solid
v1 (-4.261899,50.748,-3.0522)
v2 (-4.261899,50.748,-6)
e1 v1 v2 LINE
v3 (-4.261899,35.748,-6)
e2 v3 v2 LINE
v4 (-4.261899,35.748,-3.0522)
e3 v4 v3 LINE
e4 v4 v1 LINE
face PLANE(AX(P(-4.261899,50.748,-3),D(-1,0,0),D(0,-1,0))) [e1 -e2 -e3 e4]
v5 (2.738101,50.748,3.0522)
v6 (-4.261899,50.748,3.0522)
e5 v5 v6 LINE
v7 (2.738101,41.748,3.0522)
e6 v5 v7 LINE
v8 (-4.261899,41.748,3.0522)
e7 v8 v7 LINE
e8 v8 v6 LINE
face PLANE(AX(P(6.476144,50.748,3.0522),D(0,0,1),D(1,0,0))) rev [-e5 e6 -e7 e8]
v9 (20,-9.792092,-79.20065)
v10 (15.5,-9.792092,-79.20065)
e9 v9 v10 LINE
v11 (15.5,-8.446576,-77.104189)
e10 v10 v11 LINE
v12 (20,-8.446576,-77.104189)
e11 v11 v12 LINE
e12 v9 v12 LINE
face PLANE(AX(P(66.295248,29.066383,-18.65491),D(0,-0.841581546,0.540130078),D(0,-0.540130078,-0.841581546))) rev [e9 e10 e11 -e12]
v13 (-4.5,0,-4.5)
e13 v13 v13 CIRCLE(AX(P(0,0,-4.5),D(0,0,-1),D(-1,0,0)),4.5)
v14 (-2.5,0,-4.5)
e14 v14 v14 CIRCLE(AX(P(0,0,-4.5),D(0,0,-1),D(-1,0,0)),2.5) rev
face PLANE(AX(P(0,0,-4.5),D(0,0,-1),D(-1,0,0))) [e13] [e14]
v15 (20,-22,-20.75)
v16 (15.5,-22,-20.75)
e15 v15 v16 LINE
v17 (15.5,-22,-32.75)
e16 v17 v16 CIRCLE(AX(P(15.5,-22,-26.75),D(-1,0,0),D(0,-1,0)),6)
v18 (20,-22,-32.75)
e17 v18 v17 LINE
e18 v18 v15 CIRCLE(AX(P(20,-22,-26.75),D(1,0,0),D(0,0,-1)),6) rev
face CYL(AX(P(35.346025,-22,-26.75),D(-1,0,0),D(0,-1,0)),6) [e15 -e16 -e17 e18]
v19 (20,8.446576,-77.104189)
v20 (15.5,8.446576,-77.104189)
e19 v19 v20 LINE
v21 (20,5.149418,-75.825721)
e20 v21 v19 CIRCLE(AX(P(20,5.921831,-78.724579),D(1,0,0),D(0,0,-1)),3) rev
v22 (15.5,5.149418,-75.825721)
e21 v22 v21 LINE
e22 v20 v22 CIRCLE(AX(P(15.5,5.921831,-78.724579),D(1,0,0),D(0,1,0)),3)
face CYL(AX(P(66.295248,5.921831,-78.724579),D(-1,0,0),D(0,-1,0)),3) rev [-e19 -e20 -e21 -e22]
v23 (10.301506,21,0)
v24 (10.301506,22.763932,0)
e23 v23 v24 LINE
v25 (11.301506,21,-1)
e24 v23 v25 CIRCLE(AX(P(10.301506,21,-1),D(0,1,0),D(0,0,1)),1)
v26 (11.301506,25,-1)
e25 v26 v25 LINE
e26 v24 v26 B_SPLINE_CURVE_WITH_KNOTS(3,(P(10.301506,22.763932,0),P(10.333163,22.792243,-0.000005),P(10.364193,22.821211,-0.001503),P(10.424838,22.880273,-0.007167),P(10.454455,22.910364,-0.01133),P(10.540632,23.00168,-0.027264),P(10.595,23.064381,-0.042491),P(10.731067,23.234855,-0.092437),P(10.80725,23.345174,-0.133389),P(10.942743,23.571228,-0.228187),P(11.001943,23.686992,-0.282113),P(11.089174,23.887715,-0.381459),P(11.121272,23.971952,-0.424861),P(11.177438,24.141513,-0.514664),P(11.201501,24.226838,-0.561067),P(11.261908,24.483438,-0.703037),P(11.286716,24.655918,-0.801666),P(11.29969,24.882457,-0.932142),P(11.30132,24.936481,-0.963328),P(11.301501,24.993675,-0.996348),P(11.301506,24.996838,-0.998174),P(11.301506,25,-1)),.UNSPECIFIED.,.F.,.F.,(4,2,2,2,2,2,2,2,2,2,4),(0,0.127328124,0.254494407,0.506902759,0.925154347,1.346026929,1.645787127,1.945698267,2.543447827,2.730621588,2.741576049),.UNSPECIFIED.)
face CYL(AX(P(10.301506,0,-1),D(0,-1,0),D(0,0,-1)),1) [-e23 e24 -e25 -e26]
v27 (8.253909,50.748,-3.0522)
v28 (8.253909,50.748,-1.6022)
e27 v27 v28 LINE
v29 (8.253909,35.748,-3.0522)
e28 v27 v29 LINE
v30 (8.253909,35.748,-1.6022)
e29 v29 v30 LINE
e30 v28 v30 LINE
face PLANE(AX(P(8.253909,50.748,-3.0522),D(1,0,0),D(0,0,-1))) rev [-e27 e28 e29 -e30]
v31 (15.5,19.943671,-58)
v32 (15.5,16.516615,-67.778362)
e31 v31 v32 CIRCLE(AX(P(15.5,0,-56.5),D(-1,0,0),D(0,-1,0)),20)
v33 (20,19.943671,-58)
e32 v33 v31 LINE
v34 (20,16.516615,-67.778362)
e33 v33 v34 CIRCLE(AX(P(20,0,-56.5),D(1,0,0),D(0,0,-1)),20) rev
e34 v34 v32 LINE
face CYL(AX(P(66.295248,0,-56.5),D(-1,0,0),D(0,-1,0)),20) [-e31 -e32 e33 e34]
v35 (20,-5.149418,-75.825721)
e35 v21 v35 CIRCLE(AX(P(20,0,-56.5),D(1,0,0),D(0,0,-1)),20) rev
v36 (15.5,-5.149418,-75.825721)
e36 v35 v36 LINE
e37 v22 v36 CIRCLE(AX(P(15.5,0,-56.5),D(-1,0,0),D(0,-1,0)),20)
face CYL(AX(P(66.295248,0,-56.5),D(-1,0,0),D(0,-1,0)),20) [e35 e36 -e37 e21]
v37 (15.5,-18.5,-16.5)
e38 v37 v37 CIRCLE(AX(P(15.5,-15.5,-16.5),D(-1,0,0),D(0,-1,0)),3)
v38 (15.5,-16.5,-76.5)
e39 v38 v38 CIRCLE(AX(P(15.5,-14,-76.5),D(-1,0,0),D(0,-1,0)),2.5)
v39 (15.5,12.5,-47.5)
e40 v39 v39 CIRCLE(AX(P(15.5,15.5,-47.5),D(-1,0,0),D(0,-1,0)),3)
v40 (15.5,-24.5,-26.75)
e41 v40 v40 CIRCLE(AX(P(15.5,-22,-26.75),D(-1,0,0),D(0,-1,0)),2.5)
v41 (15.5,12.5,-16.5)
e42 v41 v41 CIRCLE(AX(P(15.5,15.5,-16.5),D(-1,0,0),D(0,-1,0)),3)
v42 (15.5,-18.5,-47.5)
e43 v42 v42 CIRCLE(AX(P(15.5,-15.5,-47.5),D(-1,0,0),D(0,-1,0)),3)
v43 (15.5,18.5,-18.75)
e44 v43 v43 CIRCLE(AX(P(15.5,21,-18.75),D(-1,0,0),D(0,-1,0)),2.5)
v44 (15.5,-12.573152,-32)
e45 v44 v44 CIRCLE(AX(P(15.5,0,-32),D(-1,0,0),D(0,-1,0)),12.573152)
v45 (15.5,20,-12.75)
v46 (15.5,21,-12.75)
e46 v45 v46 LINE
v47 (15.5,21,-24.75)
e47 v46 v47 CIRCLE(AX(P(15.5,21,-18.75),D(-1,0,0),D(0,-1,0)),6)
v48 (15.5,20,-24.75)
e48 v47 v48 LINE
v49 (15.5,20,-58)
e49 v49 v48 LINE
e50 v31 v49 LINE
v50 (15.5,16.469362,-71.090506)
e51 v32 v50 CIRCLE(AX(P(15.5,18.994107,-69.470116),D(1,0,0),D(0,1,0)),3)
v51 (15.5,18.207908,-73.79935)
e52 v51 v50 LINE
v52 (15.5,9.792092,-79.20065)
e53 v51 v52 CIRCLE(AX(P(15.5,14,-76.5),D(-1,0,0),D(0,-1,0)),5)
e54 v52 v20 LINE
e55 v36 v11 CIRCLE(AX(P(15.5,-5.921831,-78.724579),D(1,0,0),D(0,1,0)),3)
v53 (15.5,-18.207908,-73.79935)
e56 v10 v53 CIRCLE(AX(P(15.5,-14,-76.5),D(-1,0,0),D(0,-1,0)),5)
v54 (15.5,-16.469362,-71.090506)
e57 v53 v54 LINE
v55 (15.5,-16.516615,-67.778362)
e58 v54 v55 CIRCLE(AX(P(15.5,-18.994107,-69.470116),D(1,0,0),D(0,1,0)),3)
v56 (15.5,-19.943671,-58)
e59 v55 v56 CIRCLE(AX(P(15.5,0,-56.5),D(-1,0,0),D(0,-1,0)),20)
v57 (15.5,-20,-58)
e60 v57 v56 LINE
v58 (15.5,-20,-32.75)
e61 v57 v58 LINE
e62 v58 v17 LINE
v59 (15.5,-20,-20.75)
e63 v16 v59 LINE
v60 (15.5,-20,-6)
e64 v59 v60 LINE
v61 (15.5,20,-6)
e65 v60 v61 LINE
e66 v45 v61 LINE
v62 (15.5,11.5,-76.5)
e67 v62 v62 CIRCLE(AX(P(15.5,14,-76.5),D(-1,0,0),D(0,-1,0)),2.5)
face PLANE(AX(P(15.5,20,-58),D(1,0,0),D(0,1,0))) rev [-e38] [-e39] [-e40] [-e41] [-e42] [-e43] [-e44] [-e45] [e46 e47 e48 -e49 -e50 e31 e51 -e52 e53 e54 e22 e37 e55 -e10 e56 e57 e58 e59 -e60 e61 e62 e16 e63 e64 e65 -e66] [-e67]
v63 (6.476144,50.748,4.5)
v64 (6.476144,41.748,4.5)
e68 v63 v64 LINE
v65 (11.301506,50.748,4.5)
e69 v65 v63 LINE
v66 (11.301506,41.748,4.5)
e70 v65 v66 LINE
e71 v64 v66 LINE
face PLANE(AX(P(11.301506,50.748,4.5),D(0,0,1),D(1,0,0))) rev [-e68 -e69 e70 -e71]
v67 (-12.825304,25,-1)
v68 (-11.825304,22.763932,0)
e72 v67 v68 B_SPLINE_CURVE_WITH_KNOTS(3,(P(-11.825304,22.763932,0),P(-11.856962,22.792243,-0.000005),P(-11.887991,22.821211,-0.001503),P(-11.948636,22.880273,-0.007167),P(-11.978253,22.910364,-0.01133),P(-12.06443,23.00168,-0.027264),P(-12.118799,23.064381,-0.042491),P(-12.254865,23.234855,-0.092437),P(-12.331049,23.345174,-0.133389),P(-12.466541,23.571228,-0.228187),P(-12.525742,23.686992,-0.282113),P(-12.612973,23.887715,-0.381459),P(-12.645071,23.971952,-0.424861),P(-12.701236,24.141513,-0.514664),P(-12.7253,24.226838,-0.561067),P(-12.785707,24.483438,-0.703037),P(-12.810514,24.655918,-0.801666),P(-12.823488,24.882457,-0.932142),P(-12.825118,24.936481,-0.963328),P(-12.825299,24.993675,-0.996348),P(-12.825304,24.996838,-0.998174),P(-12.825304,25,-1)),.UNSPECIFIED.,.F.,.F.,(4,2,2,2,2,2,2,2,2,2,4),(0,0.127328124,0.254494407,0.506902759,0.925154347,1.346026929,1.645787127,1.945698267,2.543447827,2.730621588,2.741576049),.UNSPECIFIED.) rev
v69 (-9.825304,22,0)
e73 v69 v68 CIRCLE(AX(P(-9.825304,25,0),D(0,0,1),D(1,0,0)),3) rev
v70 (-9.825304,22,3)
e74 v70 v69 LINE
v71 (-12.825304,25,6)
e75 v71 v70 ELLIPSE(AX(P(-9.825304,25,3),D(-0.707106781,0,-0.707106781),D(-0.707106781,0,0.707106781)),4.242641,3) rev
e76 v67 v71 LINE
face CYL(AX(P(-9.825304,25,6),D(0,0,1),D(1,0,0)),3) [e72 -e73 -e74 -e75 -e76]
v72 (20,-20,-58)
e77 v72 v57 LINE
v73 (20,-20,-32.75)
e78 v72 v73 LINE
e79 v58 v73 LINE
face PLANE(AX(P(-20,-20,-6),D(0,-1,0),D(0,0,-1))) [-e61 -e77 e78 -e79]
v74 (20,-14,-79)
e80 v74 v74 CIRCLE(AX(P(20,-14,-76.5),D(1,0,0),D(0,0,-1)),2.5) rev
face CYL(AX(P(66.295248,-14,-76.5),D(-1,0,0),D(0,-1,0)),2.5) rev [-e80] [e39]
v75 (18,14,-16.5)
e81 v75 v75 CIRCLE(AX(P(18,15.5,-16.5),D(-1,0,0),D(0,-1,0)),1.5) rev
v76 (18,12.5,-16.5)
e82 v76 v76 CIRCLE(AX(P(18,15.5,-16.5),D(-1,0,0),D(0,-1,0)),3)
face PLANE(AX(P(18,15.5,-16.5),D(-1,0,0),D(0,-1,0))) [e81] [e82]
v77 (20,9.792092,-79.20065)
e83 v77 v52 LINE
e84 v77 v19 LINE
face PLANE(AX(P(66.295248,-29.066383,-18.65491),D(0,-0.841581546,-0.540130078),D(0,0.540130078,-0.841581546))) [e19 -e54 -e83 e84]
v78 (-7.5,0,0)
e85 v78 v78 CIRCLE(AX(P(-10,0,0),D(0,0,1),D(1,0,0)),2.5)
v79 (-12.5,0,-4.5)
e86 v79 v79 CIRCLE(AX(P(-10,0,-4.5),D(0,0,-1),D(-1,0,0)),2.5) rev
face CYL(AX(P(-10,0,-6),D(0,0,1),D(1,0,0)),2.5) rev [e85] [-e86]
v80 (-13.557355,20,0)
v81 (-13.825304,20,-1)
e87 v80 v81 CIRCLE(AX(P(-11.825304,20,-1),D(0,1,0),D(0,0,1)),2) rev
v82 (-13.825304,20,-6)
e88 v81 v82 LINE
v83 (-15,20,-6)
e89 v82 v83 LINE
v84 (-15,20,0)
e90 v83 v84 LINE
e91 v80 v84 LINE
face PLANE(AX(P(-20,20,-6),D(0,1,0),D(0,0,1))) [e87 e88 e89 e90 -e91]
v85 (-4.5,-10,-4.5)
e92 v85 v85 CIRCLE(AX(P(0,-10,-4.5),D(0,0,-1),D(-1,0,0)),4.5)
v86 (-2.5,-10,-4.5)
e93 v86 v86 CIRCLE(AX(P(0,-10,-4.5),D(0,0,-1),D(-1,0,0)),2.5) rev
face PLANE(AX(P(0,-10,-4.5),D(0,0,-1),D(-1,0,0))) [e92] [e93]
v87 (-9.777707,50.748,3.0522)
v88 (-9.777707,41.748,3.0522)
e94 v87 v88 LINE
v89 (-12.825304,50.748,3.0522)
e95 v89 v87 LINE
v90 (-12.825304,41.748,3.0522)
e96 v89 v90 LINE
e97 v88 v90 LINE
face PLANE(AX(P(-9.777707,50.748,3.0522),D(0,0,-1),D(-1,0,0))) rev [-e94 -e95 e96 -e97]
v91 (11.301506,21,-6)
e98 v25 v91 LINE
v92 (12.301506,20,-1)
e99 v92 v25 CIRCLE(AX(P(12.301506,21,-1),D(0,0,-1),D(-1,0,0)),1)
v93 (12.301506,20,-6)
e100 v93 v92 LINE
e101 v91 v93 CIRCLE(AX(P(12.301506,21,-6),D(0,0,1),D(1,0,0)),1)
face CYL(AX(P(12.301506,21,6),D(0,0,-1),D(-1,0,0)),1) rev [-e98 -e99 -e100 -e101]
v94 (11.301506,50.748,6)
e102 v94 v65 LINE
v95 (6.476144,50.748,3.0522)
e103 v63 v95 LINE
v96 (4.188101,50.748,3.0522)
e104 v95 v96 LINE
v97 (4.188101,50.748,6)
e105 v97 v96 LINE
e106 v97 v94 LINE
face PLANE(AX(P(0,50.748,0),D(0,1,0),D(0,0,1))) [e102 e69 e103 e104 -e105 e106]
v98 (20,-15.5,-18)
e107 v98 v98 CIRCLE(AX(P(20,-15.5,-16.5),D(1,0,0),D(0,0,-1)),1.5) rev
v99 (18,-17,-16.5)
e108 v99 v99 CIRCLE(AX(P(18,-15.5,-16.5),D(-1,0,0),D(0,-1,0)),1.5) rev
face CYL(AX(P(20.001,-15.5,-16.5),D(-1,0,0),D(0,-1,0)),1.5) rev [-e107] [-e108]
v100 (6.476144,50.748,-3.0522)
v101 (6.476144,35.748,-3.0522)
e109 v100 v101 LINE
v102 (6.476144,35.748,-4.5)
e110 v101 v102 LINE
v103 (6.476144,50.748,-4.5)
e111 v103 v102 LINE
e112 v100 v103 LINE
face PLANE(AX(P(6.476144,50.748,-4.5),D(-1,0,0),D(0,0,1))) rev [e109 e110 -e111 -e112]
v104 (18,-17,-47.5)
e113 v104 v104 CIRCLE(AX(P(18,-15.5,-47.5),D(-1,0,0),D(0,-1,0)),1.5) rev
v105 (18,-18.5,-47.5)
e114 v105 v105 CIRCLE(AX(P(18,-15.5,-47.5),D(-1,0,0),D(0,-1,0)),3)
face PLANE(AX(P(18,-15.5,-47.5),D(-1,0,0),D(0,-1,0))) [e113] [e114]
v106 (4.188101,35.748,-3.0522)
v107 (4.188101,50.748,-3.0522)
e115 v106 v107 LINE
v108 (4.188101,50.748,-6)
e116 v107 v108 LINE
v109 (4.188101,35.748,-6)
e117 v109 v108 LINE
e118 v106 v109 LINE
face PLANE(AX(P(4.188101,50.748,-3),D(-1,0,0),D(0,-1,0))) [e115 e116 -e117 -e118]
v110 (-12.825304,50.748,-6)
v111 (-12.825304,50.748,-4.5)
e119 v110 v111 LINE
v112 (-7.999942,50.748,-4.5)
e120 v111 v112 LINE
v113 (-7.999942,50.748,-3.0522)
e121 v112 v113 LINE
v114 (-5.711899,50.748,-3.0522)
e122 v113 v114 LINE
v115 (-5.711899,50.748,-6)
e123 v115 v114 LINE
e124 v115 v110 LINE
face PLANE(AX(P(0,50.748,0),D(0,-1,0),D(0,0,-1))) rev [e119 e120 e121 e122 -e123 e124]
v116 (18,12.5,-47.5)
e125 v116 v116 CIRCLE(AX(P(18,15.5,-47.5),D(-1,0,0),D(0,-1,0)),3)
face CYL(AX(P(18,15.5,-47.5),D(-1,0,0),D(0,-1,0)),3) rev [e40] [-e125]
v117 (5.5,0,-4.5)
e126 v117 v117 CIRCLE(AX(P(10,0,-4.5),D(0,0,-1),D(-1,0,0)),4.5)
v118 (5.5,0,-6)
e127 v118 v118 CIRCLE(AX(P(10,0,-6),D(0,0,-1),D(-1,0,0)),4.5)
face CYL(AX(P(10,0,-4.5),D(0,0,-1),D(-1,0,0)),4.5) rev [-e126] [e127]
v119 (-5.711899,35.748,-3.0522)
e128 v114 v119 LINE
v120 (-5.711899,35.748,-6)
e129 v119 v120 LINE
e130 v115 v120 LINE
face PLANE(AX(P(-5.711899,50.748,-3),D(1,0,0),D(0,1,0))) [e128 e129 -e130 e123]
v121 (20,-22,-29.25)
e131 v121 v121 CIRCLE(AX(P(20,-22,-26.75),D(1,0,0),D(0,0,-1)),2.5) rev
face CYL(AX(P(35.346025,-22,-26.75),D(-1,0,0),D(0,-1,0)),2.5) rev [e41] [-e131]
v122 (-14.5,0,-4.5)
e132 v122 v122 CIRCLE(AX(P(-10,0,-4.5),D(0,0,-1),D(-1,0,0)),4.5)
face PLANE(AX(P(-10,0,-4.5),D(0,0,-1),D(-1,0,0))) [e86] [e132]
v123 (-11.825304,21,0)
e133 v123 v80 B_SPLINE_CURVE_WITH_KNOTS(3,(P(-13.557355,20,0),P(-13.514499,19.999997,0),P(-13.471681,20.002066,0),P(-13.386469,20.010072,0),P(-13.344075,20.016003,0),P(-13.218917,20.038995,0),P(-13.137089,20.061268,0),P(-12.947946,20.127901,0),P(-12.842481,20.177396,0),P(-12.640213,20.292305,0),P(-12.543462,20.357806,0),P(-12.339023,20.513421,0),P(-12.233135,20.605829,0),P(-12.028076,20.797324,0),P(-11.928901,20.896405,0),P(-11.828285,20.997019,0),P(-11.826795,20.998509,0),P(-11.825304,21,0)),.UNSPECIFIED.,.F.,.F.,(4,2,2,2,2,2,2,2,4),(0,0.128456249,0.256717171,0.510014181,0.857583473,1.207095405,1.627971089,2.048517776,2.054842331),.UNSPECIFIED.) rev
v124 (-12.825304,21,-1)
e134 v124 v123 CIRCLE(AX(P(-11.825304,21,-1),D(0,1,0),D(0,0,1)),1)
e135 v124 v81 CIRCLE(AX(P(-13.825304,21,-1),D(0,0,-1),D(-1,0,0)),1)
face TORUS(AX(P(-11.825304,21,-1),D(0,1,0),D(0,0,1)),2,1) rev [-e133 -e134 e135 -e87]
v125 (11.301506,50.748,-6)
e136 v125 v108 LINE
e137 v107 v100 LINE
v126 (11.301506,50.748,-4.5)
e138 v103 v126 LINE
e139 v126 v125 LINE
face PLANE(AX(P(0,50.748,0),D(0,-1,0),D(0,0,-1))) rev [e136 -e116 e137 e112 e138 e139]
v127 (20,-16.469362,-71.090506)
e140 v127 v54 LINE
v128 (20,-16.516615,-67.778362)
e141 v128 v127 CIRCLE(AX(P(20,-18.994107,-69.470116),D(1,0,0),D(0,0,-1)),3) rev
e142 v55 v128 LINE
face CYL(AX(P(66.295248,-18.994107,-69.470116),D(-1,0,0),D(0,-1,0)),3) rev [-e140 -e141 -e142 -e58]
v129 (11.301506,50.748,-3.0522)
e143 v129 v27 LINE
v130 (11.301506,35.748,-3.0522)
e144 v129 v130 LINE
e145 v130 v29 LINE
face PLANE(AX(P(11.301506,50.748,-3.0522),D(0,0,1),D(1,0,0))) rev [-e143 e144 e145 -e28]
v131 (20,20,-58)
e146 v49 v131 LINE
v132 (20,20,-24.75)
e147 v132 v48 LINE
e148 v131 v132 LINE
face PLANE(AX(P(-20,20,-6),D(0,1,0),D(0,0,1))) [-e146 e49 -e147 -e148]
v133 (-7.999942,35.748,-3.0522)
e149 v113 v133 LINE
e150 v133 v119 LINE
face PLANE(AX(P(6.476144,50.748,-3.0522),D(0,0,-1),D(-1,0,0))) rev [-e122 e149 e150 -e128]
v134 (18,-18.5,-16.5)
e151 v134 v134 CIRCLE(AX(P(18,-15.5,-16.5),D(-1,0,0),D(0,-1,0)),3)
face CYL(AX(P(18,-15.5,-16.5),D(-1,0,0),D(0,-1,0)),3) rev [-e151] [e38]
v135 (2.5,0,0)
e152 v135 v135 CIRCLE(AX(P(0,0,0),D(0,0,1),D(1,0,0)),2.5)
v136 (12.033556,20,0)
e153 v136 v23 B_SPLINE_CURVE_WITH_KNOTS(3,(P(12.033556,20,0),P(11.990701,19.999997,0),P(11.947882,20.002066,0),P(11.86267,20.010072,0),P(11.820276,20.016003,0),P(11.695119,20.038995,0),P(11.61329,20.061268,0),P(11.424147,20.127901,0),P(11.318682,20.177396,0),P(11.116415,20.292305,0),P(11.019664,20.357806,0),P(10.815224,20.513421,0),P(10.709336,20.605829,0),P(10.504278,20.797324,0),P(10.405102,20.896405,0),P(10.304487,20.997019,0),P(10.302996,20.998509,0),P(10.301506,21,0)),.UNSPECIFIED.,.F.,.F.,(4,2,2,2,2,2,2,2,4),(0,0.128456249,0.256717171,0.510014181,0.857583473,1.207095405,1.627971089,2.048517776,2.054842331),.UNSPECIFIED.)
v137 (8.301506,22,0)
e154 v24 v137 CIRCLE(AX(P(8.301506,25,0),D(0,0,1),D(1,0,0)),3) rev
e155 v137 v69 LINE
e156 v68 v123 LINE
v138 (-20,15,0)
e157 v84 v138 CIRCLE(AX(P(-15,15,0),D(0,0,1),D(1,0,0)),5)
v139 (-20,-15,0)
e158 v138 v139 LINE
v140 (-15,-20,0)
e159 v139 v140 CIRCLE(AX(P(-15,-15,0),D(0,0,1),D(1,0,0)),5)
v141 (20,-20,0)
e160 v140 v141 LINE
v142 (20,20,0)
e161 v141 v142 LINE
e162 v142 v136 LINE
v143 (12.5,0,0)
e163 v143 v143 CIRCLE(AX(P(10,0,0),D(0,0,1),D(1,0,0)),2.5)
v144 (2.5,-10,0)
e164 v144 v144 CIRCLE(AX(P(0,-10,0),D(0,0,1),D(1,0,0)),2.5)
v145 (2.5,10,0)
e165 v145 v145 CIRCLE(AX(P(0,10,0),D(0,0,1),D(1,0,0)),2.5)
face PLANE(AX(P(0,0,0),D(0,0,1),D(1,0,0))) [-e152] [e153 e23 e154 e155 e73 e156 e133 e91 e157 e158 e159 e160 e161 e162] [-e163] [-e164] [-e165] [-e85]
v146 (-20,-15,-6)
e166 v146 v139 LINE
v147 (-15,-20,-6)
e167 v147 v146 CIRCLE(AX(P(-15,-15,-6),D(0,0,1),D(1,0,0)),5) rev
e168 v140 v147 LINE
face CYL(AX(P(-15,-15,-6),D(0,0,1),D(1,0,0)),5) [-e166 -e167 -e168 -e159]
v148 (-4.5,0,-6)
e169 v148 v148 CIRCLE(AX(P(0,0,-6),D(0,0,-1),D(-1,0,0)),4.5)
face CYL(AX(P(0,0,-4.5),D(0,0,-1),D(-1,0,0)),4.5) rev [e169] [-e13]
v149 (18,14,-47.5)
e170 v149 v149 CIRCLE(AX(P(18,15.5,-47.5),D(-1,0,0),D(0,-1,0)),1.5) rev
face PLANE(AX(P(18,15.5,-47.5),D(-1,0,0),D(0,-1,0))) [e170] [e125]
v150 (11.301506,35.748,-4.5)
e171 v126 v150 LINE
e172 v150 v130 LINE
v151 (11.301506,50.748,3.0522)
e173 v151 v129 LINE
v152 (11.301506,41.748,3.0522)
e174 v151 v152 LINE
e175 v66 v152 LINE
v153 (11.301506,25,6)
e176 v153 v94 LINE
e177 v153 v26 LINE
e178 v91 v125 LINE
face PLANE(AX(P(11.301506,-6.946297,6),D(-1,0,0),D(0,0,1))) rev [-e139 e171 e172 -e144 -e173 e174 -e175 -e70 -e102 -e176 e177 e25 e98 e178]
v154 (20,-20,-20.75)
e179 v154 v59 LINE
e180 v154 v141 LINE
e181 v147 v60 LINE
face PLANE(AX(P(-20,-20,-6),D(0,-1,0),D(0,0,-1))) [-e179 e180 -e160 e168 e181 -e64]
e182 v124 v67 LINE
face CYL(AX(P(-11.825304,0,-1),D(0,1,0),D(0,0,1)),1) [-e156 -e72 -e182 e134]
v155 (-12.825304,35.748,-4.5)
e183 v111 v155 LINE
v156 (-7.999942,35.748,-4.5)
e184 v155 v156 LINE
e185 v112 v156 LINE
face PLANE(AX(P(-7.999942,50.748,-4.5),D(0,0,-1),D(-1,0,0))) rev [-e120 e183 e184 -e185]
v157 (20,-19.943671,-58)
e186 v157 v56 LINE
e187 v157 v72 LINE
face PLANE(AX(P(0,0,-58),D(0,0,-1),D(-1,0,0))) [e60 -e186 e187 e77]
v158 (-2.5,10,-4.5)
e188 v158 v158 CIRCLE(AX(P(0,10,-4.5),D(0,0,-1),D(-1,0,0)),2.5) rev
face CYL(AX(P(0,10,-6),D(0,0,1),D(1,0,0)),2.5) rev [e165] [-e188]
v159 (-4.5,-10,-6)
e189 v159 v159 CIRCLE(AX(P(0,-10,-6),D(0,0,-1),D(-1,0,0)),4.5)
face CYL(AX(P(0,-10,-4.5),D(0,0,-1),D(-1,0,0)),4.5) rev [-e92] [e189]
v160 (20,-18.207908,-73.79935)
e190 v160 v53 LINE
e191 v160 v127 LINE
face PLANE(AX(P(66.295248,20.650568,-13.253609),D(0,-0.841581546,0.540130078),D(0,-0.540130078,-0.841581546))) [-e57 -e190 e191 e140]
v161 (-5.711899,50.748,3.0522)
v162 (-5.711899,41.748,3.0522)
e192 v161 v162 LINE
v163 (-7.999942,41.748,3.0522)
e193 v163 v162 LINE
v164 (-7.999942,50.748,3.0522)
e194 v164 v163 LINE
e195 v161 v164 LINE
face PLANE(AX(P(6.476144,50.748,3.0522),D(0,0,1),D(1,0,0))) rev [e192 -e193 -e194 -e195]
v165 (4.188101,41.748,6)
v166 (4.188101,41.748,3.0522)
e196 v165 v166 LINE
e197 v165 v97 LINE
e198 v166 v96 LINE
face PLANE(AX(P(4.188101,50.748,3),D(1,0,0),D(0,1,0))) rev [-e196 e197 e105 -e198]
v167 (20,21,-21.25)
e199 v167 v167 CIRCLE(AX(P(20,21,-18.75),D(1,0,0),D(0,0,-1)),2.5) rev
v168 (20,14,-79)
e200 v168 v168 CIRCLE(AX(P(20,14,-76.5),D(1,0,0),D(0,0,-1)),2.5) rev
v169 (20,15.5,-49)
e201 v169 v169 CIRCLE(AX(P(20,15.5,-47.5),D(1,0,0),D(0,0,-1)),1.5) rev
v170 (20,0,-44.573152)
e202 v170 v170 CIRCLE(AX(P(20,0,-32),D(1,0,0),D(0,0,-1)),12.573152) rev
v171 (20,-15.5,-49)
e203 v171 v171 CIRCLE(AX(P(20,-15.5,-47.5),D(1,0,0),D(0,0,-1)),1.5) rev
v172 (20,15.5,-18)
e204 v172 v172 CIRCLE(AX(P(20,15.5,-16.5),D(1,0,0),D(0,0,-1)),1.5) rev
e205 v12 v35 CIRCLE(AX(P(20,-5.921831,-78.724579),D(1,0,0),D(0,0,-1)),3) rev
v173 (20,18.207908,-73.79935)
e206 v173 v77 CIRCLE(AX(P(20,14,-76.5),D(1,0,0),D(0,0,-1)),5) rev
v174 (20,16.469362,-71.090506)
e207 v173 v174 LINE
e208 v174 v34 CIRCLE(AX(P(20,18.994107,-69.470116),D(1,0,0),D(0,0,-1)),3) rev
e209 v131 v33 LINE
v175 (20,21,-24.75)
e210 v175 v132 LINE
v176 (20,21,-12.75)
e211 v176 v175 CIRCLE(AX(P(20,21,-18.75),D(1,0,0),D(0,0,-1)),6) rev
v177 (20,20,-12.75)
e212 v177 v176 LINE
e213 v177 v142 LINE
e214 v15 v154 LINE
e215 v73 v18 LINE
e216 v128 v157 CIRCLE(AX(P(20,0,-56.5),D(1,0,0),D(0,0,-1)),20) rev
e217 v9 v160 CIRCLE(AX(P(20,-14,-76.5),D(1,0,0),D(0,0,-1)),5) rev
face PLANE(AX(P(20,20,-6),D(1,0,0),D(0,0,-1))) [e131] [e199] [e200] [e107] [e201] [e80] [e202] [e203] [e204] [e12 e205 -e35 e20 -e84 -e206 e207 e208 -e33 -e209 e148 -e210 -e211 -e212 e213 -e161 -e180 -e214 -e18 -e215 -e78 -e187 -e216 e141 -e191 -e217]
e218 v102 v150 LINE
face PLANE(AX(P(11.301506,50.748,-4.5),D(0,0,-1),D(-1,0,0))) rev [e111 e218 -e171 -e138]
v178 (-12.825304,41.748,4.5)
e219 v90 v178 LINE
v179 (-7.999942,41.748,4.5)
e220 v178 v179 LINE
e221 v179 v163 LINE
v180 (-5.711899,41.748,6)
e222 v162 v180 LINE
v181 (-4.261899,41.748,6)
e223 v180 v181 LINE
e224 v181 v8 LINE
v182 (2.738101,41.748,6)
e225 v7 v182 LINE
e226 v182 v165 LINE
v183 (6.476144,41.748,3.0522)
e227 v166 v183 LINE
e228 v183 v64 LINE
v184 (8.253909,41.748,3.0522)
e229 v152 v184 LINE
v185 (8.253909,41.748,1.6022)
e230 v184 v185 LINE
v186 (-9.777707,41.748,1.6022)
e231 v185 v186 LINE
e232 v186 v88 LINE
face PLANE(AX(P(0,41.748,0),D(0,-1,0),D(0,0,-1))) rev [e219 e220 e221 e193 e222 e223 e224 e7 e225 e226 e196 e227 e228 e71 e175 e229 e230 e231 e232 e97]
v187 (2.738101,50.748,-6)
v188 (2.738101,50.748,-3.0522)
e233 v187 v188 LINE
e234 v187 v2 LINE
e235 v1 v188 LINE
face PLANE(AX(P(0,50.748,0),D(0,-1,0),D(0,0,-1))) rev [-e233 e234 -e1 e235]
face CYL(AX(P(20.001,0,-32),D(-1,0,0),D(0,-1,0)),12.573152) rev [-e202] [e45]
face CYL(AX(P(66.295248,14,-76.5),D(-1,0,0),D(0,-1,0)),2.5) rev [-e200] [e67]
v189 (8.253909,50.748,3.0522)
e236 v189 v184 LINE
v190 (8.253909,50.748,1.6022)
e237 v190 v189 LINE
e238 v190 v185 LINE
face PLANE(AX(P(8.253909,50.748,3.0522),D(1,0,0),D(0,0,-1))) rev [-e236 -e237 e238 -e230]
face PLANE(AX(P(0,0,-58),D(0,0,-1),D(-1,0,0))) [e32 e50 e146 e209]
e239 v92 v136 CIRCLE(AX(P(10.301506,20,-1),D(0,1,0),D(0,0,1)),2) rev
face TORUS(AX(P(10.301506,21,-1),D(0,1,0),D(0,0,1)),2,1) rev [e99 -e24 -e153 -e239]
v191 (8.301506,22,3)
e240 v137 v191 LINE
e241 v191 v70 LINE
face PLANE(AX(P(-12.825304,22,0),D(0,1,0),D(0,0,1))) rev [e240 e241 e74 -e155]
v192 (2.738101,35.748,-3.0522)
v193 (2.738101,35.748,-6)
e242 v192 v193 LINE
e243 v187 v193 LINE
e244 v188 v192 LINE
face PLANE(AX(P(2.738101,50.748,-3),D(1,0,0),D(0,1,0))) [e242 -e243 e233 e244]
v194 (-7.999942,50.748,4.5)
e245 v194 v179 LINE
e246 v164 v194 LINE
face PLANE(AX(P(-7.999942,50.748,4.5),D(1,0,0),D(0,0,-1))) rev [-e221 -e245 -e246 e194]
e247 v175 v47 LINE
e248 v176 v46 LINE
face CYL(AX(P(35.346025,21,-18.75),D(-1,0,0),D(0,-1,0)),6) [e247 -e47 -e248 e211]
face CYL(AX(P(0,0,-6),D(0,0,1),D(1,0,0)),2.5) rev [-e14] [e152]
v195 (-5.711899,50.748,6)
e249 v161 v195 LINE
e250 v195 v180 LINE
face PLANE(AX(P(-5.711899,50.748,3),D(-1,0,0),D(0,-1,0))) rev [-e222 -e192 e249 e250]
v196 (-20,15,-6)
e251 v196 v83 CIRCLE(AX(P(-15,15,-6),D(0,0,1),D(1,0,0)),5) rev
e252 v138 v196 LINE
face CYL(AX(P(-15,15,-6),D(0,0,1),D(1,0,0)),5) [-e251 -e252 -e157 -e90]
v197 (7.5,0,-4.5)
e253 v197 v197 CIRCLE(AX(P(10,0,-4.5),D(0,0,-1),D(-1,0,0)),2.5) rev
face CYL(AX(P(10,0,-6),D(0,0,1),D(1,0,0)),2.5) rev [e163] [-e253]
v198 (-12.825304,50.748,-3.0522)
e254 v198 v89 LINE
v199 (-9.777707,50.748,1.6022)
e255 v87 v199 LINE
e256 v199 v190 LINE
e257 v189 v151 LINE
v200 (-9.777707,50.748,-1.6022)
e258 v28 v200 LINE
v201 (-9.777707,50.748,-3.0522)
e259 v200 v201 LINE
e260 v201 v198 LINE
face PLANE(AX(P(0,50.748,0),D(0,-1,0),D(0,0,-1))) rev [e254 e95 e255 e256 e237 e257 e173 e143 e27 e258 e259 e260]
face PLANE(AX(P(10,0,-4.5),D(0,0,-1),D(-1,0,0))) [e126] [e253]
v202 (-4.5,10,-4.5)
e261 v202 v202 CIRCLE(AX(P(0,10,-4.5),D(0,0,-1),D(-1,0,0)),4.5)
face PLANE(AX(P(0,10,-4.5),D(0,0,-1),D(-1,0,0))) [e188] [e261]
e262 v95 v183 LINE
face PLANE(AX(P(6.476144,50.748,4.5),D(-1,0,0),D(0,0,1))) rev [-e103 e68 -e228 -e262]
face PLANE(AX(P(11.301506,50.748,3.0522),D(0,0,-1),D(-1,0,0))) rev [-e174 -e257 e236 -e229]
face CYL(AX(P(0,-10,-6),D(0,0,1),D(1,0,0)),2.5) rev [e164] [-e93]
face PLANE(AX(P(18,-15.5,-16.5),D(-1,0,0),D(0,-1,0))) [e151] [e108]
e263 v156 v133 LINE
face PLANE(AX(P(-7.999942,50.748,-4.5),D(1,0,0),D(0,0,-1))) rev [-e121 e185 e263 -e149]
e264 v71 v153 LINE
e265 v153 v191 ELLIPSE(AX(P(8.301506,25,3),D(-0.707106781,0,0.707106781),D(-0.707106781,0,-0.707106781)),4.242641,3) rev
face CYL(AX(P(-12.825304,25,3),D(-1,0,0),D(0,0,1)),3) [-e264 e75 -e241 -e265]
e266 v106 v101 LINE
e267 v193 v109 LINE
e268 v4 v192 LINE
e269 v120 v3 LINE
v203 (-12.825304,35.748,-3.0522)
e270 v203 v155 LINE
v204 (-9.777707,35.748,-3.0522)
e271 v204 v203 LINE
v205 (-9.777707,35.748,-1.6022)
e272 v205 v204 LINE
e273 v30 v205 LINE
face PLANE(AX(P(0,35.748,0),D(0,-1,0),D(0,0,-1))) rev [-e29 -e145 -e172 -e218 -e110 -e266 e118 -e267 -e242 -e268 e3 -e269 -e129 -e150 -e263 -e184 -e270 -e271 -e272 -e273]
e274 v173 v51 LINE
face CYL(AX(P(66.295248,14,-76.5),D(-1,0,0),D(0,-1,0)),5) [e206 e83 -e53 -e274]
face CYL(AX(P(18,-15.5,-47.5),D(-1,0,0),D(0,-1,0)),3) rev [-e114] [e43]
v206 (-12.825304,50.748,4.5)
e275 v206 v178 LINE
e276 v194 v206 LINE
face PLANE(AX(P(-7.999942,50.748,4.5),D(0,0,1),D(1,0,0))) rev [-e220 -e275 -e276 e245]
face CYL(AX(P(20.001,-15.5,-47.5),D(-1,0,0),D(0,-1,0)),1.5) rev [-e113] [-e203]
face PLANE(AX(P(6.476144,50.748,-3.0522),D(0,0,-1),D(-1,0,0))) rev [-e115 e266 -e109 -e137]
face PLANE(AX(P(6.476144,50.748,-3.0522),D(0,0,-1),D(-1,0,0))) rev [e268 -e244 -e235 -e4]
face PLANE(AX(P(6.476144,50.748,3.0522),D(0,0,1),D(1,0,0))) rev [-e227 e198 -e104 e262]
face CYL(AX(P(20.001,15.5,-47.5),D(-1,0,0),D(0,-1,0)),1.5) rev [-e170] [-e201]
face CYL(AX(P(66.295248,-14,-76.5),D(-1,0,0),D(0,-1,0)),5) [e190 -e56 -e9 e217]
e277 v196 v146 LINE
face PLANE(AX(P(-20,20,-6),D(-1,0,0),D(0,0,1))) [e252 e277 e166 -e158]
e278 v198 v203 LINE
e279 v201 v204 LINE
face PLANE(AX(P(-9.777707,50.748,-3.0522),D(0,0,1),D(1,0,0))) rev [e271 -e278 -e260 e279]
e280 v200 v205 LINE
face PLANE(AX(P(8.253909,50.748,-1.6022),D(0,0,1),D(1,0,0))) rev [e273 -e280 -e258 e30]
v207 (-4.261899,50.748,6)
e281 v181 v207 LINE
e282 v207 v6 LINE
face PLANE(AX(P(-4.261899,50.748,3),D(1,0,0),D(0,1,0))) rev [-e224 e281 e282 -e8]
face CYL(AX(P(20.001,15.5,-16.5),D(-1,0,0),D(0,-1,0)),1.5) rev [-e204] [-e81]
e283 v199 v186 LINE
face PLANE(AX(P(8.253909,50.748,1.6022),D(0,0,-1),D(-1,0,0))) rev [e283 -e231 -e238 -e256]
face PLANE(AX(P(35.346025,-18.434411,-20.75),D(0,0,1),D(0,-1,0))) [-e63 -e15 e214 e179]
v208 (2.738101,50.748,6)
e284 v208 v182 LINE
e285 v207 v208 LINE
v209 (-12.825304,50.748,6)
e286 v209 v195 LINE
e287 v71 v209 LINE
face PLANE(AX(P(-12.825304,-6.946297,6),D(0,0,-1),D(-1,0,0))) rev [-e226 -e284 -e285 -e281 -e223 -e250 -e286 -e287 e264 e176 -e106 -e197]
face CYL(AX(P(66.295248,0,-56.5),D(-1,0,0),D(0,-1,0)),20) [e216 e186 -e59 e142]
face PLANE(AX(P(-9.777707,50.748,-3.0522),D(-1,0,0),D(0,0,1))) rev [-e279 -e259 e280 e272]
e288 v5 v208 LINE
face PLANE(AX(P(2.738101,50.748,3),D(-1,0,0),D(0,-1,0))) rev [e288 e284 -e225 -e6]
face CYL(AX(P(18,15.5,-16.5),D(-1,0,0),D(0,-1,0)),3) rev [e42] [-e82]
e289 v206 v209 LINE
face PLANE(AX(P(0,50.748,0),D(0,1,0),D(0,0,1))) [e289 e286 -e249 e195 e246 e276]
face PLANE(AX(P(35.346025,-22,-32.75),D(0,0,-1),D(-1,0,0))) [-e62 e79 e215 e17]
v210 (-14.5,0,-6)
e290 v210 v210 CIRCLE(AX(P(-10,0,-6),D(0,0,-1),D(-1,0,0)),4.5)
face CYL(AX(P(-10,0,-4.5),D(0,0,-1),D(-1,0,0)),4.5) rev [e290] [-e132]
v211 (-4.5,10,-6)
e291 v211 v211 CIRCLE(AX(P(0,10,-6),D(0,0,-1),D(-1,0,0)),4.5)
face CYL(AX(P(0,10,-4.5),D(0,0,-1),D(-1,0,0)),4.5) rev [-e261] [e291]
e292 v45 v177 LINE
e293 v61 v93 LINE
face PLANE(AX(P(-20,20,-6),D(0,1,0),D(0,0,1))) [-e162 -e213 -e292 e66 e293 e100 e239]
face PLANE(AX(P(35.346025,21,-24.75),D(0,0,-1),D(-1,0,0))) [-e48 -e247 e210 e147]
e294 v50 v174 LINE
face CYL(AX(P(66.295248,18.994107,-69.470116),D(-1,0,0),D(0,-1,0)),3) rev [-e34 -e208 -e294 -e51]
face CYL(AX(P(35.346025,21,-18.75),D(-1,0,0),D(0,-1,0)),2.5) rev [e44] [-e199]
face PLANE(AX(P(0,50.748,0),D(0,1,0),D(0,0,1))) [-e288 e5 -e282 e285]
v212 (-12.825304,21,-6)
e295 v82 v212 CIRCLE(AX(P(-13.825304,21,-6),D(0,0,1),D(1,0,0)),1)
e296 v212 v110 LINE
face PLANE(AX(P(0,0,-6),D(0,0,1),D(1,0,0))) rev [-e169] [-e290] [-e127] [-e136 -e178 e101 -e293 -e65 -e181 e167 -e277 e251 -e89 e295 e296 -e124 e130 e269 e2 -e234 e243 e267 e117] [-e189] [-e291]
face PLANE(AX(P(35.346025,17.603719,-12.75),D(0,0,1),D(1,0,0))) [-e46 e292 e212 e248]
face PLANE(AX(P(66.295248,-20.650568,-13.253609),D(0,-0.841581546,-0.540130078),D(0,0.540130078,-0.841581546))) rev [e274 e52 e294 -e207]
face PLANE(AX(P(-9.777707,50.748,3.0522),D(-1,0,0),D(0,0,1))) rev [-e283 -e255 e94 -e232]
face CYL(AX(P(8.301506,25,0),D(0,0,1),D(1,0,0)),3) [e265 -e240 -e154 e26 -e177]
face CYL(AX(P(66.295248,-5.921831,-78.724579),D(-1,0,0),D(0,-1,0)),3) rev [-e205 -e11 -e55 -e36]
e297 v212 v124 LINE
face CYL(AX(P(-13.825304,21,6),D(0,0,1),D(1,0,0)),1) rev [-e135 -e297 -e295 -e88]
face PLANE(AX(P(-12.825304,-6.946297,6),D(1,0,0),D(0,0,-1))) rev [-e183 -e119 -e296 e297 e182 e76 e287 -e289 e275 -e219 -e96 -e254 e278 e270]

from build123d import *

# Parameters (mm, degrees)
SKETCH2_W             = 40
SKETCH2_H             = 40
SKETCH2_R             = 2.5
BOSS_EXTRUDE1_DEPTH   = 6
SKETCH3_W             = 4.5
SKETCH3_H             = 40
BOSS_EXTRUDE2_DEPTH   = 52
CUT_EXTRUDE1_REACH    = 72.882
SKETCH4_R             = 12.573151632
SKETCH4_R_2           = 1.5
SKETCH5_R             = 4.5
CUT_EXTRUDE2_DEPTH    = 1.5
SKETCH6_R             = 3
CUT_EXTRUDE3_DEPTH    = 2.5
FILLET1_R             = 5
BOSS_EXTRUDE3_START   = 15.748
BOSS_EXTRUDE3_DEPTH   = 15
BOSS_EXTRUDE3_2_DEPTH = 15
BOSS_EXTRUDE3_3_DEPTH = 15
SKETCH18_W            = 24.126809507
SKETCH18_H            = 12
BOSS_EXTRUDE12_DEPTH  = 15.748
SKETCH11_R            = 2.5
BOSS_EXTRUDE6_DEPTH   = 4.5
FILLET2_R             = 3
BOSS_EXTRUDE13_REACH  = 104.361
SKETCH9_R             = 2.5
SKETCH19_R            = 2.5
CUT_EXTRUDE7_DEPTH    = 4.5
SKETCH15_R            = 3
CUT_EXTRUDE8_DEPTH    = 2.5
SKETCH21_W            = 24.126809507
SKETCH21_H            = 2
CUT_EXTRUDE9_DEPTH    = 6
SKETCH22_W            = 1.45
SKETCH22_H            = 15
CUT_EXTRUDE10_DEPTH   = 3
SKETCH23_W            = 24.126809507
SKETCH23_H            = 4.3978
BOSS_EXTRUDE14_DEPTH  = 6
FILLET4_R             = 3
FILLET5_R             = 1
FILLET6_R             = 1


with BuildPart() as part:
    # Sketch2 → Boss-Extrude1 (new body)
    with BuildSketch(Plane.XY):
        Rectangle(SKETCH2_W, SKETCH2_H)
        Circle(SKETCH2_R, mode=Mode.SUBTRACT)
        with Locations((0, 10)):
            Circle(SKETCH2_R, mode=Mode.SUBTRACT)
        with Locations((0, -10)):
            Circle(SKETCH2_R, mode=Mode.SUBTRACT)
        with Locations((-10, 0)):
            Circle(SKETCH2_R, mode=Mode.SUBTRACT)
        with Locations((10, 0)):
            Circle(SKETCH2_R, mode=Mode.SUBTRACT)
    extrude(amount=-BOSS_EXTRUDE1_DEPTH)

    # Sketch3 → Boss-Extrude2 (add)
    with BuildSketch(Plane(origin=(0, 0, -6), x_dir=(-1, 0, 0), z_dir=(0, 0, -1))):
        with Locations((-17.75, 0)):
            Rectangle(SKETCH3_W, SKETCH3_H)
    extrude(amount=BOSS_EXTRUDE2_DEPTH)

    # Sketch4 → Cut-Extrude1 (cut, up to next)
    with BuildSketch(Plane.ZY.offset(-15.5), mode=Mode.PRIVATE) as cut_extrude1_sk1:
        with Locations(Location((-32, 0, 0), (0, 0, 270))):
            Circle(SKETCH4_R)
    cut_extrude1_tool1 = extrude(cut_extrude1_sk1.sketch, amount=-CUT_EXTRUDE1_REACH, mode=Mode.PRIVATE) & part.part
    # Sketch4 → Cut-Extrude1 (cut, up to next)
    with BuildSketch(Plane.ZY.offset(-15.5), mode=Mode.PRIVATE) as cut_extrude1_sk2:
        with Locations(Location((-16.5, 15.5, 0), (0, 0, 270))):
            Circle(SKETCH4_R_2)
    cut_extrude1_tool2 = extrude(cut_extrude1_sk2.sketch, amount=-CUT_EXTRUDE1_REACH, mode=Mode.PRIVATE) & part.part
    # Sketch4 → Cut-Extrude1 (cut, up to next)
    with BuildSketch(Plane.ZY.offset(-15.5), mode=Mode.PRIVATE) as cut_extrude1_sk3:
        with Locations(Location((-16.5, -15.5, 0), (0, 0, 270))):
            Circle(SKETCH4_R_2)
    cut_extrude1_tool3 = extrude(cut_extrude1_sk3.sketch, amount=-CUT_EXTRUDE1_REACH, mode=Mode.PRIVATE) & part.part
    # Sketch4 → Cut-Extrude1 (cut, up to next)
    with BuildSketch(Plane.ZY.offset(-15.5), mode=Mode.PRIVATE) as cut_extrude1_sk4:
        with Locations(Location((-47.5, -15.5, 0), (0, 0, 270))):
            Circle(SKETCH4_R_2)
    cut_extrude1_tool4 = extrude(cut_extrude1_sk4.sketch, amount=-CUT_EXTRUDE1_REACH, mode=Mode.PRIVATE) & part.part
    # Sketch4 → Cut-Extrude1 (cut, up to next)
    with BuildSketch(Plane.ZY.offset(-15.5), mode=Mode.PRIVATE) as cut_extrude1_sk5:
        with Locations(Location((-47.5, 15.5, 0), (0, 0, 270))):
            Circle(SKETCH4_R_2)
    cut_extrude1_tool5 = extrude(cut_extrude1_sk5.sketch, amount=-CUT_EXTRUDE1_REACH, mode=Mode.PRIVATE) & part.part
    add(cut_extrude1_tool1.solids().sort_by_distance((15.5, 0, -32))[0], mode=Mode.SUBTRACT)
    add(cut_extrude1_tool2.solids().sort_by_distance((15.5, 15.5, -16.5))[0], mode=Mode.SUBTRACT)
    add(cut_extrude1_tool3.solids().sort_by_distance((15.5, -15.5, -16.5))[0], mode=Mode.SUBTRACT)
    add(cut_extrude1_tool4.solids().sort_by_distance((15.5, -15.5, -47.5))[0], mode=Mode.SUBTRACT)
    add(cut_extrude1_tool5.solids().sort_by_distance((15.5, 15.5, -47.5))[0], mode=Mode.SUBTRACT)

    # Sketch5 → Cut-Extrude2 (cut)
    with BuildSketch(Plane(origin=(0, 0, -6), x_dir=(-1, 0, 0), z_dir=(0, 0, -1))):
        with Locations((0, 10)):
            Circle(SKETCH5_R)
        Circle(SKETCH5_R)
        with Locations((10, 0)):
            Circle(SKETCH5_R)
        with Locations((0, -10)):
            Circle(SKETCH5_R)
        with Locations((-10, 0)):
            Circle(SKETCH5_R)
    extrude(amount=-CUT_EXTRUDE2_DEPTH, mode=Mode.SUBTRACT)

    # Sketch6 → Cut-Extrude3 (cut)
    with BuildSketch(Plane.ZY.offset(-15.5)):
        with Locations(Location((-16.5, 15.5, 0), (0, 0, 270))):
            Circle(SKETCH6_R)
        with Locations(Location((-47.5, 15.5, 0), (0, 0, 270))):
            Circle(SKETCH6_R)
        with Locations(Location((-47.5, -15.5, 0), (0, 0, 270))):
            Circle(SKETCH6_R)
        with Locations(Location((-16.5, -15.5, 0), (0, 0, 270))):
            Circle(SKETCH6_R)
    extrude(amount=-CUT_EXTRUDE3_DEPTH, mode=Mode.SUBTRACT)

    # Fillet1
    fillet1_edges = [part.edges().sort_by_distance(p)[0] for p in [
        (-20, 20, -3),
        (-20, -20, -3),
    ]]
    fillet(fillet1_edges, radius=FILLET1_R)



with BuildPart() as body_2:
    # Sketch7 → Boss-Extrude3 (new body)
    with BuildSketch(Plane(origin=(0, 20, 0), x_dir=(1, 0, 0), z_dir=(0, 1, 0)).offset(BOSS_EXTRUDE3_START)):
        Polygon((11.301505506, -6), (-12.825304001, -6), (-12.825304001, -4.5), (-7.9999421, -4.5), (-7.9999421, -3.0522), (6.476143604, -3.0522), (6.476143604, -4.5), (11.301505506, -4.5), align=None)
    extrude(amount=BOSS_EXTRUDE3_DEPTH)


with BuildPart() as body_3:
    # Sketch7 → Boss-Extrude3 2 (new body)
    with BuildSketch(Plane(origin=(0, 20, 0), x_dir=(1, 0, 0), z_dir=(0, 1, 0)).offset(BOSS_EXTRUDE3_START)):
        Polygon((6.476143604, 3.0522), (-7.9999421, 3.0522), (-7.9999421, 4.5), (-12.825304001, 4.5), (-12.825304001, 6), (11.301505506, 6), (11.301505506, 4.5), (6.476143604, 4.5), align=None)
    extrude(amount=BOSS_EXTRUDE3_2_DEPTH)


with BuildPart() as body_4:
    # Sketch7 → Boss-Extrude3 3 (new body)
    with BuildSketch(Plane(origin=(0, 20, 0), x_dir=(1, 0, 0), z_dir=(0, 1, 0)).offset(BOSS_EXTRUDE3_START)):
        Polygon((-12.825304001, 3.0522), (-12.825304001, -3.0522), (-9.777707011, -3.0522), (-9.777707011, -1.6022), (8.253908515, -1.6022), (8.253908515, -3.0522), (11.301505506, -3.0522), (11.301505506, 3.0522), (8.253908515, 3.0522), (8.253908515, 1.6022), (-9.777707011, 1.6022), (-9.777707011, 3.0522), align=None)
    extrude(amount=BOSS_EXTRUDE3_3_DEPTH)


with BuildPart() as part_1:
    add(part.part)

    add(body_2.part)  # Boss-Extrude12 merges body 2

    add(body_3.part)  # Boss-Extrude12 merges body 3

    add(body_4.part)  # Boss-Extrude12 merges body 4
    # Sketch18 → Boss-Extrude12 (add)
    with BuildSketch(Plane.XZ.offset(-35.748)):
        with Locations((-0.761899247, 0)):
            Rectangle(SKETCH18_W, SKETCH18_H)
    extrude(amount=BOSS_EXTRUDE12_DEPTH)

    # Sketch11 → Boss-Extrude6 (add)
    # profile 1 of 3: a face of its own
    with BuildSketch(Plane.ZY.offset(-15.5)):
        with BuildLine():
            Line((-58, -19.943670675), (-58, 19.943670675))
            ThreePointArc((-58, 19.943670675), (-64.026515977, 18.5297479), (-69.332027993, 15.34076457))
            ThreePointArc((-69.332027993, 15.34076457), (-72.76360296, 11.640241353), (-75.159610133, 7.198538025))
            ThreePointArc((-75.159610133, 7.198538025), (-76.5, 0), (-75.159610133, -7.198538025))
            ThreePointArc((-75.159610133, -7.198538025), (-72.76360296, -11.640241353), (-69.332027993, -15.34076457))
            ThreePointArc((-69.332027993, -15.34076457), (-64.026515977, -18.5297479), (-58, -19.943670675))
        make_face()
    # profile 2 of 3: a face of its own
    with BuildSketch(Plane.ZY.offset(-15.5)):
        with BuildLine():
            ThreePointArc((-75.159610133, 7.198538025), (-72.76360296, 11.640241353), (-69.332027993, 15.34076457))
            Line((-69.332027993, 15.34076457), (-73.799349609, 18.20790773))
            ThreePointArc((-73.799349609, 18.20790773), (-80.70790773, 16.700650391), (-79.200650391, 9.79209227))
            Line((-79.200650391, 9.79209227), (-75.159610133, 7.198538025))
        make_face()
        with Locations(Location((-76.5, 14, 0), (0, 0, 270))):
            Circle(SKETCH11_R, mode=Mode.SUBTRACT)
    # profile 3 of 3: a face of its own
    with BuildSketch(Plane.ZY.offset(-15.5)):
        with BuildLine():
            Line((-73.799349609, -18.20790773), (-69.332027993, -15.34076457))
            ThreePointArc((-69.332027993, -15.34076457), (-72.76360296, -11.640241353), (-75.159610133, -7.198538025))
            Line((-75.159610133, -7.198538025), (-79.200650391, -9.79209227))
            ThreePointArc((-79.200650391, -9.79209227), (-80.70790773, -16.700650391), (-73.799349609, -18.20790773))
        make_face()
        with Locations(Location((-76.5, -14, 0), (0, 0, 270))):
            Circle(SKETCH11_R, mode=Mode.SUBTRACT)
    extrude(amount=-BOSS_EXTRUDE6_DEPTH)

    # Fillet2
    fillet2_edges = [part_1.edges().sort_by_distance(p)[0] for p in [
        (17.75, -15.34076457, -69.332027993),
        (17.75, -7.198538025, -75.159610133),
        (17.75, 7.198538025, -75.159610133),
        (17.75, 15.34076457, -69.332027993),
    ]]
    fillet(fillet2_edges, radius=FILLET2_R)

    # Boss-Extrude13: up to this face of the body (flat: up to its plane)
    boss_extrude13_end = Plane(part_1.part.faces().sort_by_distance((20, 18.017606594, -62.814692575))[0])
    # Sketch9 → Boss-Extrude13 (add, up to the picked face)
    with BuildSketch(Plane.ZY.offset(-15.5), mode=Mode.PRIVATE) as boss_extrude13_sk1:
        with BuildLine():
            Line((-32.75, -22), (-32.75, -18.434411342))
            Line((-32.75, -18.434411342), (-20.75, -18.434411342))
            Line((-20.75, -18.434411342), (-20.75, -22))
            ThreePointArc((-20.75, -22), (-26.75, -28), (-32.75, -22))
        make_face()
        with Locations((-26.75, -22)):
            Circle(SKETCH9_R, mode=Mode.SUBTRACT)
    boss_extrude13_tool1 = split(extrude(boss_extrude13_sk1.sketch, amount=-BOSS_EXTRUDE13_REACH, mode=Mode.PRIVATE), bisect_by=boss_extrude13_end, keep=Keep.BOTH, mode=Mode.PRIVATE)
    # Sketch9 → Boss-Extrude13 (add, up to the picked face)
    with BuildSketch(Plane.ZY.offset(-15.5), mode=Mode.PRIVATE) as boss_extrude13_sk2:
        with BuildLine():
            Line((-24.75, 21), (-24.75, 17.603718698))
            Line((-24.75, 17.603718698), (-12.75, 17.603718698))
            Line((-12.75, 17.603718698), (-12.75, 21))
            ThreePointArc((-12.75, 21), (-18.75, 27), (-24.75, 21))
        make_face()
        with Locations((-18.75, 21)):
            Circle(SKETCH9_R, mode=Mode.SUBTRACT)
    boss_extrude13_tool2 = split(extrude(boss_extrude13_sk2.sketch, amount=-BOSS_EXTRUDE13_REACH, mode=Mode.PRIVATE), bisect_by=boss_extrude13_end, keep=Keep.BOTH, mode=Mode.PRIVATE)
    add(boss_extrude13_tool1.solids().sort_by(Axis((15.5, -20.217206, -32.59654), (1, 0, 0)))[0])
    add(boss_extrude13_tool2.solids().sort_by(Axis((15.5, 19.301859, -24.597589), (1, 0, 0)))[0])

    # Sketch19 → Cut-Extrude7 (cut)
    with BuildSketch(Plane.ZY.offset(-15.5)):
        with Locations(Location((-18.75, 21, 0), (0, 0, 270))):
            Circle(SKETCH19_R)
        with Locations(Location((-26.75, -22, 0), (0, 0, 270))):
            Circle(SKETCH19_R)
    extrude(amount=-CUT_EXTRUDE7_DEPTH, mode=Mode.SUBTRACT)

    # Sketch15 → Cut-Extrude8 (cut)
    with BuildSketch(Plane.ZY.offset(-15.5)):
        with Locations(Location((-16.5, 15.5, 0), (0, 0, 270))):
            Circle(SKETCH15_R)
    extrude(amount=-CUT_EXTRUDE8_DEPTH, mode=Mode.SUBTRACT)

    # Sketch21 → Cut-Extrude9 (cut)
    with BuildSketch(Plane.XY.offset(6)):
        with Locations((-0.761899247, 21)):
            Rectangle(SKETCH21_W, SKETCH21_H)
    extrude(amount=-CUT_EXTRUDE9_DEPTH, mode=Mode.SUBTRACT)

    # Sketch22 → Cut-Extrude10 (cut)
    with BuildSketch(Plane.XY.offset(6)):
        with Locations((-4.986899248, 43.248)):
            Rectangle(SKETCH22_W, SKETCH22_H)
        with Locations((3.463100752, 43.248)):
            Rectangle(SKETCH22_W, SKETCH22_H)
    cut_extrude10 = extrude(amount=-CUT_EXTRUDE10_DEPTH, mode=Mode.SUBTRACT)

    # Mirror6: Cut-Extrude10 across plane
    add(cut_extrude10.mirror(Plane.XY), mode=Mode.SUBTRACT)

    # Sketch23 → Boss-Extrude14 (add)
    with BuildSketch(Plane(origin=(0, 35.748, 0), x_dir=(1, 0, 0), z_dir=(0, 1, 0))):
        with Locations((-0.761899247, -3.8011)):
            Rectangle(SKETCH23_W, SKETCH23_H)
    extrude(amount=BOSS_EXTRUDE14_DEPTH)

    # Fillet4
    fillet4_edges = [part_1.edges().sort_by_distance(p)[0] for p in [
        (-12.825304001, 22, 3),
        (11.301505506, 22, 3),
        (-0.761899248, 22, 6),
    ]]
    fillet(fillet4_edges, radius=FILLET4_R)

    # Fillet5
    fillet5_edges = [part_1.edges().sort_by_distance(p)[0] for p in [
        (-12.825304001, 22.5, 0),
        (11.301505506, 22.5, 0),
    ]]
    fillet(fillet5_edges, radius=FILLET5_R)

    # Fillet6
    # the kernel refuses this fillet: 1 mm, written as the material it adds along each edge
    with BuildSketch(Plane(origin=(-12.825304001, 20, -6), x_dir=(0, 1, 0), z_dir=(0, 0, 1)), Plane(origin=(11.301505506, 20, -1), x_dir=(0, 1, 0), z_dir=(0, 0, -1))) as fillet6_piece_1:
        with BuildLine():
            CenterArc((FILLET6_R, FILLET6_R), FILLET6_R, 180, 90)
            Line((0, FILLET6_R), (0, 0))
            Line((0, 0), (FILLET6_R, 0))
        make_face()
    extrude(amount=5)
    with BuildSketch(Plane(origin=(-11.825304001, 20, -1), x_dir=(-1, 0, 0), z_dir=(0, 0, -1))) as fillet6_piece_2_section:
        with BuildLine():
            CenterArc((1 + FILLET6_R, FILLET6_R), FILLET6_R, 180, 90)
            Line((1 + FILLET6_R, 0), (1, 0))
            Line((1, 0), (1, FILLET6_R))
        make_face()
    fillet6_piece_2 = revolve(axis=Axis((-11.825304001, 20, -1), (0, 1, 0)), revolution_arc=233.296989237, mode=Mode.PRIVATE)
    fillet6_piece_2 = split(fillet6_piece_2, bisect_by=Plane(origin=(-12.575242997, 20.3116281, 0), z_dir=(0, 0, -1)), keep=Keep.TOP, mode=Mode.PRIVATE)
    add(fillet6_piece_2)
    with BuildSketch(Plane(origin=(10.301505506, 20, -1), x_dir=(1, 0, 0), z_dir=(0, 0, -1))) as fillet6_piece_3_section:
        with BuildLine():
            CenterArc((1 + FILLET6_R, -FILLET6_R), FILLET6_R, 90, 90)
            Line((1 + FILLET6_R, 0), (1, 0))
            Line((1, 0), (1, -FILLET6_R))
        make_face()
    fillet6_piece_3 = revolve(axis=Axis((10.301505506, 20, -1), (0, -1, 0)), revolution_arc=233.296989237, mode=Mode.PRIVATE)
    fillet6_piece_3 = split(fillet6_piece_3, bisect_by=Plane(origin=(11.051444387, 20.311628394, 0), z_dir=(0, 0, -1)), keep=Keep.TOP, mode=Mode.PRIVATE)
    add(fillet6_piece_3)


solid = part_1.part
